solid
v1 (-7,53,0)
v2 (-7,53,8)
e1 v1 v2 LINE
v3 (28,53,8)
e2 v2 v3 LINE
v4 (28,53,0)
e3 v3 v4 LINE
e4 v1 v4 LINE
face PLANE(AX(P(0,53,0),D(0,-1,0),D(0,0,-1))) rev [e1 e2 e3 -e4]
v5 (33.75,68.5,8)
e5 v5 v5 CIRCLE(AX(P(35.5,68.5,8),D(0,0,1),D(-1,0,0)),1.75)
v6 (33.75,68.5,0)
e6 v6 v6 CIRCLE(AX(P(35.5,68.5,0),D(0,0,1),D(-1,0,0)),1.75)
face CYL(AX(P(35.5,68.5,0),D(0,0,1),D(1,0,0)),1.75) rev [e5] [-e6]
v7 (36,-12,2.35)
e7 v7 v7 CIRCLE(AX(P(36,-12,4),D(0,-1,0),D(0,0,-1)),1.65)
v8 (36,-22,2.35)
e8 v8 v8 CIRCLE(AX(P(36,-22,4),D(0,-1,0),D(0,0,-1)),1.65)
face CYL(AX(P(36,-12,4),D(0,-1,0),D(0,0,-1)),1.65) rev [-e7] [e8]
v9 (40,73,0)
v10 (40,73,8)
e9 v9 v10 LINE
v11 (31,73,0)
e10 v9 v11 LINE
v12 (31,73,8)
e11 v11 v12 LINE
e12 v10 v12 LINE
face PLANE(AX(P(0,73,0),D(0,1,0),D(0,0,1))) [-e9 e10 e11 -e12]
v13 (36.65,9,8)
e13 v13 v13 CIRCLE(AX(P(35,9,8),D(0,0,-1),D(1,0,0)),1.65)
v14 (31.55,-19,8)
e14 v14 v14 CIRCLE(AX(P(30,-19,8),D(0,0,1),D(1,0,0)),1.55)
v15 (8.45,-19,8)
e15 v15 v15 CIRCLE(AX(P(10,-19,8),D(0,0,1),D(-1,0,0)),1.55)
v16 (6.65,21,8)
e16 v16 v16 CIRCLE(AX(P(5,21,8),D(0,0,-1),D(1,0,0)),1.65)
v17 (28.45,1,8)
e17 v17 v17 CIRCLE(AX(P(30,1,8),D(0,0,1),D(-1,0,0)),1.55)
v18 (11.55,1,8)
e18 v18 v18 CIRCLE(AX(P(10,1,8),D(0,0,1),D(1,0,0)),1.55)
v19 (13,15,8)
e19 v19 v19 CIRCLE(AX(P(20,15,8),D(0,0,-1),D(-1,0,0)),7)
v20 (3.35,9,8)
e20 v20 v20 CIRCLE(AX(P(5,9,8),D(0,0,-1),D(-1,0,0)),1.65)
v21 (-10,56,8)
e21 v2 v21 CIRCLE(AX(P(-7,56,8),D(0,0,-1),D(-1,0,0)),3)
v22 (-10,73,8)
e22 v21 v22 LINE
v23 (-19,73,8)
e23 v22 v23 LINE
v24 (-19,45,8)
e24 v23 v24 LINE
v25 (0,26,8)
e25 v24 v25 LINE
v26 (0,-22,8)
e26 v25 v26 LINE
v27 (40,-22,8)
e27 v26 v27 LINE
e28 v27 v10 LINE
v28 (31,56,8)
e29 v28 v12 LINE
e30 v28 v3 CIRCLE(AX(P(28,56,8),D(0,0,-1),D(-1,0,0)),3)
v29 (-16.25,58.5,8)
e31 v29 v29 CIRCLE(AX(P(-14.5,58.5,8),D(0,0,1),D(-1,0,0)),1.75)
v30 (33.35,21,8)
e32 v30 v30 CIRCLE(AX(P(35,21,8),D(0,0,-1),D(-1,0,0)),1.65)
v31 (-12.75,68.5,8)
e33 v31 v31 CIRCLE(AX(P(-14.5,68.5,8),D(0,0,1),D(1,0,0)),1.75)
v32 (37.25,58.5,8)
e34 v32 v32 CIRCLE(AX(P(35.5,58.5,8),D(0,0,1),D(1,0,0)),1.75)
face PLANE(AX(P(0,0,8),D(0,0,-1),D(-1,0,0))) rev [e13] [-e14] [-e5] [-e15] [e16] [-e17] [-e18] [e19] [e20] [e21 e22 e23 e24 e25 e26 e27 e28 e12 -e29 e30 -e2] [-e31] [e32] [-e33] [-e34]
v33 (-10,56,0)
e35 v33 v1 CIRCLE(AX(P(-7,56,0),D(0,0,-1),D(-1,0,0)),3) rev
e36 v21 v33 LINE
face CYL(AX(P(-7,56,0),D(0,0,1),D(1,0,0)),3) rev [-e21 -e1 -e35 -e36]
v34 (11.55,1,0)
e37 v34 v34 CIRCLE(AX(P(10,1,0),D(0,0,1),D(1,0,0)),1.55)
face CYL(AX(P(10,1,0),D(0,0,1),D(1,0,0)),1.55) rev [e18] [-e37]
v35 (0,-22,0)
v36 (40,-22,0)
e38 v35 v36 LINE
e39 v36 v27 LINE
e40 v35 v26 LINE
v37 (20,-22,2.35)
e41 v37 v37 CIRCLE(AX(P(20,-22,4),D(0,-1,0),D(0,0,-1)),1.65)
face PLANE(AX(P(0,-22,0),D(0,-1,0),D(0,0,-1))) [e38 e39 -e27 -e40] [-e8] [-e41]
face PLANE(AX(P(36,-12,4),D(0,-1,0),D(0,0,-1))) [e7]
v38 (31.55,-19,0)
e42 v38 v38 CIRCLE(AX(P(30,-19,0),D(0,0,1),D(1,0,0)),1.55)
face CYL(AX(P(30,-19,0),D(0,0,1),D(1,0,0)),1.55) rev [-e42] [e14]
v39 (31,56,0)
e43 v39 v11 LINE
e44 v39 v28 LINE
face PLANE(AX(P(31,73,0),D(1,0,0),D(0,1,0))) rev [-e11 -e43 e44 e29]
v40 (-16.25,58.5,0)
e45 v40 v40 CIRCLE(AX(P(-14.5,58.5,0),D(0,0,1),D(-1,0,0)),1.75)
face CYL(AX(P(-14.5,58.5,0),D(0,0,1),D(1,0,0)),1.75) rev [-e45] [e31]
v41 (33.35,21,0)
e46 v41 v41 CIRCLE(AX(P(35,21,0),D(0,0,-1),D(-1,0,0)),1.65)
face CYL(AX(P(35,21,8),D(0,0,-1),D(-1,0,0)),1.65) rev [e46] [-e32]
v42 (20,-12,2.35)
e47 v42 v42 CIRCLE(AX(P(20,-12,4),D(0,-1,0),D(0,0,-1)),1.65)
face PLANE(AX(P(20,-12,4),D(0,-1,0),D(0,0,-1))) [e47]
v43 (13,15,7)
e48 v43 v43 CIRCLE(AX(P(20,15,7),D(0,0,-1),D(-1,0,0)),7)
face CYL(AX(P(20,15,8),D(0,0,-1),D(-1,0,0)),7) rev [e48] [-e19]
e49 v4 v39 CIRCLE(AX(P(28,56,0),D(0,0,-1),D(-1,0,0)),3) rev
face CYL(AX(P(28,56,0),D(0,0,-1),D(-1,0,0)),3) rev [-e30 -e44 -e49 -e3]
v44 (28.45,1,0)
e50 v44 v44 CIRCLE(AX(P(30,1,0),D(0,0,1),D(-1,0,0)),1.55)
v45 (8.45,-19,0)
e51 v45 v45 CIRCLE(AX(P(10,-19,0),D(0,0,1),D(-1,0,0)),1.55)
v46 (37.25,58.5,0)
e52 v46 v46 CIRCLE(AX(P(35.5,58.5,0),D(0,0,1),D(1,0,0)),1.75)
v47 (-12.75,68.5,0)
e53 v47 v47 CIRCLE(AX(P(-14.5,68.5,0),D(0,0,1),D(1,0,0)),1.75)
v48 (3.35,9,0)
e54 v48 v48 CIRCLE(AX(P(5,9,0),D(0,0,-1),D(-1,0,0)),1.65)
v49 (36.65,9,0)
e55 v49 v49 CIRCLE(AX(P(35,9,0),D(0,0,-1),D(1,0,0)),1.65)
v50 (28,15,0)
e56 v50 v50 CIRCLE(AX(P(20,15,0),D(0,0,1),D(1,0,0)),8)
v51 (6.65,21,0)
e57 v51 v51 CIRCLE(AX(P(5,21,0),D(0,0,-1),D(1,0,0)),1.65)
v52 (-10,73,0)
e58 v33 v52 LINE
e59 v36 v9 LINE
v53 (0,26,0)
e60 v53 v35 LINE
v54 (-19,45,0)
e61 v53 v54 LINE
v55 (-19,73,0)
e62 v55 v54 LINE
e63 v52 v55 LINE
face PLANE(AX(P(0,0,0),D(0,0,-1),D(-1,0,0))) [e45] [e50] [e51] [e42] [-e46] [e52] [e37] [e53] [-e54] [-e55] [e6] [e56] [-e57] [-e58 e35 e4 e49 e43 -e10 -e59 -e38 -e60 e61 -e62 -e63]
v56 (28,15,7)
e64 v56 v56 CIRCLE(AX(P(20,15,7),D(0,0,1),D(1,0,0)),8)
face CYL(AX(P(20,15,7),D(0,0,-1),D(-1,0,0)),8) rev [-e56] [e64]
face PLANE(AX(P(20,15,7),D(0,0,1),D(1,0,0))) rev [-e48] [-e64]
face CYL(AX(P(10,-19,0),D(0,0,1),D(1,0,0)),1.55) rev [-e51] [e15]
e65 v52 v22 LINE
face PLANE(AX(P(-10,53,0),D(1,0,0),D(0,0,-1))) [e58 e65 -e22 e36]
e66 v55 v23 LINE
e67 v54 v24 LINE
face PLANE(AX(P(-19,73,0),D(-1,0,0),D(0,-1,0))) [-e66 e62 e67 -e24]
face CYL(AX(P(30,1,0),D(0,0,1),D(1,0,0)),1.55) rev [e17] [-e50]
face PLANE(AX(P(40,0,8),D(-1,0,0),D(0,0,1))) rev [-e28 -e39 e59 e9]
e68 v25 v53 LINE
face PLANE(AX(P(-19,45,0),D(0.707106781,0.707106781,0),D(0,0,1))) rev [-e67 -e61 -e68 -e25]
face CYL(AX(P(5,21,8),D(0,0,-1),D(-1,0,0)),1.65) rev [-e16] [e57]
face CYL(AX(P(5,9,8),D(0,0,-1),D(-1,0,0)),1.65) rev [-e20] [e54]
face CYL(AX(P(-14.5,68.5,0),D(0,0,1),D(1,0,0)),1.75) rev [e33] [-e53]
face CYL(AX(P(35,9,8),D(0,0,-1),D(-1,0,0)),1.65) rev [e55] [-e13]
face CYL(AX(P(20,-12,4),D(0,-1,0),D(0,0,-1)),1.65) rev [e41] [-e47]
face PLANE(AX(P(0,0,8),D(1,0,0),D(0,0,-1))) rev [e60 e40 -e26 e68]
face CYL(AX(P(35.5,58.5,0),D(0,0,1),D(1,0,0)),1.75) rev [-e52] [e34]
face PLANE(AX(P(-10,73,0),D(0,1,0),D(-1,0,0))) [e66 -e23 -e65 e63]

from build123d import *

# Parameters (mm, degrees)
ESQUISSE1_W             = 40
ESQUISSE1_H             = 30
BOSS_EXTRU_1_DEPTH      = 8
ENL_V_START             = -8
ESQUISSE2_R             = 8
ENL_V_MAT_EXTRU_1_DEPTH = 7
ESQUISSE3_W             = 40
ESQUISSE3_H             = 22
BOSS_EXTRU_2_DEPTH      = 8
ESQUISSE4_R             = 1.55
ENL_V_MAT_EXTRU_2_DEPTH = 8
ESQUISSE5_W             = 40
ESQUISSE5_H             = 43
BOSS_EXTRU_3_DEPTH      = 8
ESQUISSE6_W             = 31
ESQUISSE6_H             = 20
ENL_V_MAT_EXTRU_3_DEPTH = 8
BOSS_EXTRU_4_DEPTH      = 8
ESQUISSE8_R             = 1.75
ENL_V_MAT_EXTRU_4_DEPTH = 84.624159189
ESQUISSE9_R             = 7
ENL_V_MAT_EXTRU_5_DEPTH = 84.534424042
ESQUISSE10_R            = 1.65
ENL_V_MAT_EXTRU_6_DEPTH = 10
ESQUISSE11_R            = 1.65
ENL_V_MAT_EXTRU_7_DEPTH = 84.624159189
CHANFREIN1_SIZE         = 19
CONG_1_R                = 3


with BuildPart() as part:
    # Esquisse1 → Boss.-Extru.1 (new body)
    with BuildSketch(Plane.XY):
        with Locations((20, 15)):
            Rectangle(ESQUISSE1_W, ESQUISSE1_H)
    extrude(amount=BOSS_EXTRU_1_DEPTH)

    # Esquisse2 → Enlèv. mat.-Extru.1 (cut)
    with BuildSketch(Plane.XY.offset(8).offset(ENL_V_START)):
        with Locations((20, 15)):
            Circle(ESQUISSE2_R)
    extrude(amount=ENL_V_MAT_EXTRU_1_DEPTH, mode=Mode.SUBTRACT)

    # Esquisse3 → Boss.-Extru.2 (add)
    with BuildSketch(Plane.XY.offset(8)):
        with Locations((20, -11)):
            Rectangle(ESQUISSE3_W, ESQUISSE3_H)
    extrude(amount=-BOSS_EXTRU_2_DEPTH)

    # Esquisse4 → Enlèv. mat.-Extru.2 (cut)
    with BuildSketch(Plane.XY.offset(8).offset(ENL_V_START)):
        with Locations((30, -19)):
            Circle(ESQUISSE4_R)
        with Locations(Location((30, 1, 0), (0, 0, 180))):
            Circle(ESQUISSE4_R)
        with Locations((10, 1)):
            Circle(ESQUISSE4_R)
        with Locations(Location((10, -19, 0), (0, 0, 180))):
            Circle(ESQUISSE4_R)
    extrude(amount=ENL_V_MAT_EXTRU_2_DEPTH, mode=Mode.SUBTRACT)

    # Esquisse5 → Boss.-Extru.3 (add)
    with BuildSketch(Plane.XY.offset(8)):
        with Locations((20, 51.5)):
            Rectangle(ESQUISSE5_W, ESQUISSE5_H)
    extrude(amount=-BOSS_EXTRU_3_DEPTH)

    # Esquisse6 → Enlèv. mat.-Extru.3 (cut)
    with BuildSketch(Plane.XY.offset(8).offset(ENL_V_START)):
        with Locations((15.5, 63)):
            Rectangle(ESQUISSE6_W, ESQUISSE6_H)
    extrude(amount=ENL_V_MAT_EXTRU_3_DEPTH, mode=Mode.SUBTRACT)

    # Esquisse7 → Boss.-Extru.4 (add)
    with BuildSketch(Plane.XY.offset(8)):
        Polygon((0, 53), (-10, 53), (-10, 73), (-19, 73), (-19, 45), (0, 45), align=None)
    extrude(amount=-BOSS_EXTRU_4_DEPTH)

    # Esquisse8 → Enlèv. mat.-Extru.4 (cut, through all)
    with BuildSketch(Plane.XY.offset(8)):
        with Locations((35.5, 58.5)):
            Circle(ESQUISSE8_R)
        with Locations(Location((35.5, 68.5, 0), (0, 0, 180))):
            Circle(ESQUISSE8_R)
        with Locations((-14.5, 68.5)):
            Circle(ESQUISSE8_R)
        with Locations(Location((-14.5, 58.5, 0), (0, 0, 180))):
            Circle(ESQUISSE8_R)
    extrude(amount=-ENL_V_MAT_EXTRU_4_DEPTH, mode=Mode.SUBTRACT)

    # Esquisse9 → Enlèv. mat.-Extru.5 (cut, through all)
    with BuildSketch(Plane(origin=(0, 0, 7), x_dir=(-1, 0, 0), z_dir=(0, 0, -1))):
        with Locations((-20, 15)):
            Circle(ESQUISSE9_R)
    extrude(amount=-ENL_V_MAT_EXTRU_5_DEPTH, mode=Mode.SUBTRACT)

    # Esquisse10 → Enlèv. mat.-Extru.6 (cut)
    with BuildSketch(Plane(origin=(0, -22, 0), x_dir=(-1, 0, 0), z_dir=(0, -1, 0))):
        with Locations(Location((-20, -4, 0), (0, 0, 90))):
            Circle(ESQUISSE10_R)
        with Locations(Location((-36, -4, 0), (0, 0, 90))):
            Circle(ESQUISSE10_R)
    extrude(amount=-ENL_V_MAT_EXTRU_6_DEPTH, mode=Mode.SUBTRACT)

    # Esquisse11 → Enlèv. mat.-Extru.7 (cut, through all)
    with BuildSketch(Plane(origin=(0, 0, 0), x_dir=(-1, 0, 0), z_dir=(0, 0, -1))):
        with Locations((-35, 21)):
            Circle(ESQUISSE11_R)
        with Locations(Location((-5, 21, 0), (0, 0, 180))):
            Circle(ESQUISSE11_R)
        with Locations((-5, 9)):
            Circle(ESQUISSE11_R)
        with Locations(Location((-35, 9, 0), (0, 0, 180))):
            Circle(ESQUISSE11_R)
    extrude(amount=-ENL_V_MAT_EXTRU_7_DEPTH, mode=Mode.SUBTRACT)

    # Chanfrein1
    chanfrein1_edges = [part.edges().sort_by_distance(p)[0] for p in [
        (0, 45, 4),
    ]]
    chamfer(chanfrein1_edges, length=CHANFREIN1_SIZE - 0.0001)  # a hair under: the kernel refuses the full size

    # Congé1
    cong_1_edges = [part.edges().sort_by_distance(p)[0] for p in [
        (31, 53, 4),
        (-10, 53, 4),
    ]]
    fillet(cong_1_edges, radius=CONG_1_R)


solid = part.part
